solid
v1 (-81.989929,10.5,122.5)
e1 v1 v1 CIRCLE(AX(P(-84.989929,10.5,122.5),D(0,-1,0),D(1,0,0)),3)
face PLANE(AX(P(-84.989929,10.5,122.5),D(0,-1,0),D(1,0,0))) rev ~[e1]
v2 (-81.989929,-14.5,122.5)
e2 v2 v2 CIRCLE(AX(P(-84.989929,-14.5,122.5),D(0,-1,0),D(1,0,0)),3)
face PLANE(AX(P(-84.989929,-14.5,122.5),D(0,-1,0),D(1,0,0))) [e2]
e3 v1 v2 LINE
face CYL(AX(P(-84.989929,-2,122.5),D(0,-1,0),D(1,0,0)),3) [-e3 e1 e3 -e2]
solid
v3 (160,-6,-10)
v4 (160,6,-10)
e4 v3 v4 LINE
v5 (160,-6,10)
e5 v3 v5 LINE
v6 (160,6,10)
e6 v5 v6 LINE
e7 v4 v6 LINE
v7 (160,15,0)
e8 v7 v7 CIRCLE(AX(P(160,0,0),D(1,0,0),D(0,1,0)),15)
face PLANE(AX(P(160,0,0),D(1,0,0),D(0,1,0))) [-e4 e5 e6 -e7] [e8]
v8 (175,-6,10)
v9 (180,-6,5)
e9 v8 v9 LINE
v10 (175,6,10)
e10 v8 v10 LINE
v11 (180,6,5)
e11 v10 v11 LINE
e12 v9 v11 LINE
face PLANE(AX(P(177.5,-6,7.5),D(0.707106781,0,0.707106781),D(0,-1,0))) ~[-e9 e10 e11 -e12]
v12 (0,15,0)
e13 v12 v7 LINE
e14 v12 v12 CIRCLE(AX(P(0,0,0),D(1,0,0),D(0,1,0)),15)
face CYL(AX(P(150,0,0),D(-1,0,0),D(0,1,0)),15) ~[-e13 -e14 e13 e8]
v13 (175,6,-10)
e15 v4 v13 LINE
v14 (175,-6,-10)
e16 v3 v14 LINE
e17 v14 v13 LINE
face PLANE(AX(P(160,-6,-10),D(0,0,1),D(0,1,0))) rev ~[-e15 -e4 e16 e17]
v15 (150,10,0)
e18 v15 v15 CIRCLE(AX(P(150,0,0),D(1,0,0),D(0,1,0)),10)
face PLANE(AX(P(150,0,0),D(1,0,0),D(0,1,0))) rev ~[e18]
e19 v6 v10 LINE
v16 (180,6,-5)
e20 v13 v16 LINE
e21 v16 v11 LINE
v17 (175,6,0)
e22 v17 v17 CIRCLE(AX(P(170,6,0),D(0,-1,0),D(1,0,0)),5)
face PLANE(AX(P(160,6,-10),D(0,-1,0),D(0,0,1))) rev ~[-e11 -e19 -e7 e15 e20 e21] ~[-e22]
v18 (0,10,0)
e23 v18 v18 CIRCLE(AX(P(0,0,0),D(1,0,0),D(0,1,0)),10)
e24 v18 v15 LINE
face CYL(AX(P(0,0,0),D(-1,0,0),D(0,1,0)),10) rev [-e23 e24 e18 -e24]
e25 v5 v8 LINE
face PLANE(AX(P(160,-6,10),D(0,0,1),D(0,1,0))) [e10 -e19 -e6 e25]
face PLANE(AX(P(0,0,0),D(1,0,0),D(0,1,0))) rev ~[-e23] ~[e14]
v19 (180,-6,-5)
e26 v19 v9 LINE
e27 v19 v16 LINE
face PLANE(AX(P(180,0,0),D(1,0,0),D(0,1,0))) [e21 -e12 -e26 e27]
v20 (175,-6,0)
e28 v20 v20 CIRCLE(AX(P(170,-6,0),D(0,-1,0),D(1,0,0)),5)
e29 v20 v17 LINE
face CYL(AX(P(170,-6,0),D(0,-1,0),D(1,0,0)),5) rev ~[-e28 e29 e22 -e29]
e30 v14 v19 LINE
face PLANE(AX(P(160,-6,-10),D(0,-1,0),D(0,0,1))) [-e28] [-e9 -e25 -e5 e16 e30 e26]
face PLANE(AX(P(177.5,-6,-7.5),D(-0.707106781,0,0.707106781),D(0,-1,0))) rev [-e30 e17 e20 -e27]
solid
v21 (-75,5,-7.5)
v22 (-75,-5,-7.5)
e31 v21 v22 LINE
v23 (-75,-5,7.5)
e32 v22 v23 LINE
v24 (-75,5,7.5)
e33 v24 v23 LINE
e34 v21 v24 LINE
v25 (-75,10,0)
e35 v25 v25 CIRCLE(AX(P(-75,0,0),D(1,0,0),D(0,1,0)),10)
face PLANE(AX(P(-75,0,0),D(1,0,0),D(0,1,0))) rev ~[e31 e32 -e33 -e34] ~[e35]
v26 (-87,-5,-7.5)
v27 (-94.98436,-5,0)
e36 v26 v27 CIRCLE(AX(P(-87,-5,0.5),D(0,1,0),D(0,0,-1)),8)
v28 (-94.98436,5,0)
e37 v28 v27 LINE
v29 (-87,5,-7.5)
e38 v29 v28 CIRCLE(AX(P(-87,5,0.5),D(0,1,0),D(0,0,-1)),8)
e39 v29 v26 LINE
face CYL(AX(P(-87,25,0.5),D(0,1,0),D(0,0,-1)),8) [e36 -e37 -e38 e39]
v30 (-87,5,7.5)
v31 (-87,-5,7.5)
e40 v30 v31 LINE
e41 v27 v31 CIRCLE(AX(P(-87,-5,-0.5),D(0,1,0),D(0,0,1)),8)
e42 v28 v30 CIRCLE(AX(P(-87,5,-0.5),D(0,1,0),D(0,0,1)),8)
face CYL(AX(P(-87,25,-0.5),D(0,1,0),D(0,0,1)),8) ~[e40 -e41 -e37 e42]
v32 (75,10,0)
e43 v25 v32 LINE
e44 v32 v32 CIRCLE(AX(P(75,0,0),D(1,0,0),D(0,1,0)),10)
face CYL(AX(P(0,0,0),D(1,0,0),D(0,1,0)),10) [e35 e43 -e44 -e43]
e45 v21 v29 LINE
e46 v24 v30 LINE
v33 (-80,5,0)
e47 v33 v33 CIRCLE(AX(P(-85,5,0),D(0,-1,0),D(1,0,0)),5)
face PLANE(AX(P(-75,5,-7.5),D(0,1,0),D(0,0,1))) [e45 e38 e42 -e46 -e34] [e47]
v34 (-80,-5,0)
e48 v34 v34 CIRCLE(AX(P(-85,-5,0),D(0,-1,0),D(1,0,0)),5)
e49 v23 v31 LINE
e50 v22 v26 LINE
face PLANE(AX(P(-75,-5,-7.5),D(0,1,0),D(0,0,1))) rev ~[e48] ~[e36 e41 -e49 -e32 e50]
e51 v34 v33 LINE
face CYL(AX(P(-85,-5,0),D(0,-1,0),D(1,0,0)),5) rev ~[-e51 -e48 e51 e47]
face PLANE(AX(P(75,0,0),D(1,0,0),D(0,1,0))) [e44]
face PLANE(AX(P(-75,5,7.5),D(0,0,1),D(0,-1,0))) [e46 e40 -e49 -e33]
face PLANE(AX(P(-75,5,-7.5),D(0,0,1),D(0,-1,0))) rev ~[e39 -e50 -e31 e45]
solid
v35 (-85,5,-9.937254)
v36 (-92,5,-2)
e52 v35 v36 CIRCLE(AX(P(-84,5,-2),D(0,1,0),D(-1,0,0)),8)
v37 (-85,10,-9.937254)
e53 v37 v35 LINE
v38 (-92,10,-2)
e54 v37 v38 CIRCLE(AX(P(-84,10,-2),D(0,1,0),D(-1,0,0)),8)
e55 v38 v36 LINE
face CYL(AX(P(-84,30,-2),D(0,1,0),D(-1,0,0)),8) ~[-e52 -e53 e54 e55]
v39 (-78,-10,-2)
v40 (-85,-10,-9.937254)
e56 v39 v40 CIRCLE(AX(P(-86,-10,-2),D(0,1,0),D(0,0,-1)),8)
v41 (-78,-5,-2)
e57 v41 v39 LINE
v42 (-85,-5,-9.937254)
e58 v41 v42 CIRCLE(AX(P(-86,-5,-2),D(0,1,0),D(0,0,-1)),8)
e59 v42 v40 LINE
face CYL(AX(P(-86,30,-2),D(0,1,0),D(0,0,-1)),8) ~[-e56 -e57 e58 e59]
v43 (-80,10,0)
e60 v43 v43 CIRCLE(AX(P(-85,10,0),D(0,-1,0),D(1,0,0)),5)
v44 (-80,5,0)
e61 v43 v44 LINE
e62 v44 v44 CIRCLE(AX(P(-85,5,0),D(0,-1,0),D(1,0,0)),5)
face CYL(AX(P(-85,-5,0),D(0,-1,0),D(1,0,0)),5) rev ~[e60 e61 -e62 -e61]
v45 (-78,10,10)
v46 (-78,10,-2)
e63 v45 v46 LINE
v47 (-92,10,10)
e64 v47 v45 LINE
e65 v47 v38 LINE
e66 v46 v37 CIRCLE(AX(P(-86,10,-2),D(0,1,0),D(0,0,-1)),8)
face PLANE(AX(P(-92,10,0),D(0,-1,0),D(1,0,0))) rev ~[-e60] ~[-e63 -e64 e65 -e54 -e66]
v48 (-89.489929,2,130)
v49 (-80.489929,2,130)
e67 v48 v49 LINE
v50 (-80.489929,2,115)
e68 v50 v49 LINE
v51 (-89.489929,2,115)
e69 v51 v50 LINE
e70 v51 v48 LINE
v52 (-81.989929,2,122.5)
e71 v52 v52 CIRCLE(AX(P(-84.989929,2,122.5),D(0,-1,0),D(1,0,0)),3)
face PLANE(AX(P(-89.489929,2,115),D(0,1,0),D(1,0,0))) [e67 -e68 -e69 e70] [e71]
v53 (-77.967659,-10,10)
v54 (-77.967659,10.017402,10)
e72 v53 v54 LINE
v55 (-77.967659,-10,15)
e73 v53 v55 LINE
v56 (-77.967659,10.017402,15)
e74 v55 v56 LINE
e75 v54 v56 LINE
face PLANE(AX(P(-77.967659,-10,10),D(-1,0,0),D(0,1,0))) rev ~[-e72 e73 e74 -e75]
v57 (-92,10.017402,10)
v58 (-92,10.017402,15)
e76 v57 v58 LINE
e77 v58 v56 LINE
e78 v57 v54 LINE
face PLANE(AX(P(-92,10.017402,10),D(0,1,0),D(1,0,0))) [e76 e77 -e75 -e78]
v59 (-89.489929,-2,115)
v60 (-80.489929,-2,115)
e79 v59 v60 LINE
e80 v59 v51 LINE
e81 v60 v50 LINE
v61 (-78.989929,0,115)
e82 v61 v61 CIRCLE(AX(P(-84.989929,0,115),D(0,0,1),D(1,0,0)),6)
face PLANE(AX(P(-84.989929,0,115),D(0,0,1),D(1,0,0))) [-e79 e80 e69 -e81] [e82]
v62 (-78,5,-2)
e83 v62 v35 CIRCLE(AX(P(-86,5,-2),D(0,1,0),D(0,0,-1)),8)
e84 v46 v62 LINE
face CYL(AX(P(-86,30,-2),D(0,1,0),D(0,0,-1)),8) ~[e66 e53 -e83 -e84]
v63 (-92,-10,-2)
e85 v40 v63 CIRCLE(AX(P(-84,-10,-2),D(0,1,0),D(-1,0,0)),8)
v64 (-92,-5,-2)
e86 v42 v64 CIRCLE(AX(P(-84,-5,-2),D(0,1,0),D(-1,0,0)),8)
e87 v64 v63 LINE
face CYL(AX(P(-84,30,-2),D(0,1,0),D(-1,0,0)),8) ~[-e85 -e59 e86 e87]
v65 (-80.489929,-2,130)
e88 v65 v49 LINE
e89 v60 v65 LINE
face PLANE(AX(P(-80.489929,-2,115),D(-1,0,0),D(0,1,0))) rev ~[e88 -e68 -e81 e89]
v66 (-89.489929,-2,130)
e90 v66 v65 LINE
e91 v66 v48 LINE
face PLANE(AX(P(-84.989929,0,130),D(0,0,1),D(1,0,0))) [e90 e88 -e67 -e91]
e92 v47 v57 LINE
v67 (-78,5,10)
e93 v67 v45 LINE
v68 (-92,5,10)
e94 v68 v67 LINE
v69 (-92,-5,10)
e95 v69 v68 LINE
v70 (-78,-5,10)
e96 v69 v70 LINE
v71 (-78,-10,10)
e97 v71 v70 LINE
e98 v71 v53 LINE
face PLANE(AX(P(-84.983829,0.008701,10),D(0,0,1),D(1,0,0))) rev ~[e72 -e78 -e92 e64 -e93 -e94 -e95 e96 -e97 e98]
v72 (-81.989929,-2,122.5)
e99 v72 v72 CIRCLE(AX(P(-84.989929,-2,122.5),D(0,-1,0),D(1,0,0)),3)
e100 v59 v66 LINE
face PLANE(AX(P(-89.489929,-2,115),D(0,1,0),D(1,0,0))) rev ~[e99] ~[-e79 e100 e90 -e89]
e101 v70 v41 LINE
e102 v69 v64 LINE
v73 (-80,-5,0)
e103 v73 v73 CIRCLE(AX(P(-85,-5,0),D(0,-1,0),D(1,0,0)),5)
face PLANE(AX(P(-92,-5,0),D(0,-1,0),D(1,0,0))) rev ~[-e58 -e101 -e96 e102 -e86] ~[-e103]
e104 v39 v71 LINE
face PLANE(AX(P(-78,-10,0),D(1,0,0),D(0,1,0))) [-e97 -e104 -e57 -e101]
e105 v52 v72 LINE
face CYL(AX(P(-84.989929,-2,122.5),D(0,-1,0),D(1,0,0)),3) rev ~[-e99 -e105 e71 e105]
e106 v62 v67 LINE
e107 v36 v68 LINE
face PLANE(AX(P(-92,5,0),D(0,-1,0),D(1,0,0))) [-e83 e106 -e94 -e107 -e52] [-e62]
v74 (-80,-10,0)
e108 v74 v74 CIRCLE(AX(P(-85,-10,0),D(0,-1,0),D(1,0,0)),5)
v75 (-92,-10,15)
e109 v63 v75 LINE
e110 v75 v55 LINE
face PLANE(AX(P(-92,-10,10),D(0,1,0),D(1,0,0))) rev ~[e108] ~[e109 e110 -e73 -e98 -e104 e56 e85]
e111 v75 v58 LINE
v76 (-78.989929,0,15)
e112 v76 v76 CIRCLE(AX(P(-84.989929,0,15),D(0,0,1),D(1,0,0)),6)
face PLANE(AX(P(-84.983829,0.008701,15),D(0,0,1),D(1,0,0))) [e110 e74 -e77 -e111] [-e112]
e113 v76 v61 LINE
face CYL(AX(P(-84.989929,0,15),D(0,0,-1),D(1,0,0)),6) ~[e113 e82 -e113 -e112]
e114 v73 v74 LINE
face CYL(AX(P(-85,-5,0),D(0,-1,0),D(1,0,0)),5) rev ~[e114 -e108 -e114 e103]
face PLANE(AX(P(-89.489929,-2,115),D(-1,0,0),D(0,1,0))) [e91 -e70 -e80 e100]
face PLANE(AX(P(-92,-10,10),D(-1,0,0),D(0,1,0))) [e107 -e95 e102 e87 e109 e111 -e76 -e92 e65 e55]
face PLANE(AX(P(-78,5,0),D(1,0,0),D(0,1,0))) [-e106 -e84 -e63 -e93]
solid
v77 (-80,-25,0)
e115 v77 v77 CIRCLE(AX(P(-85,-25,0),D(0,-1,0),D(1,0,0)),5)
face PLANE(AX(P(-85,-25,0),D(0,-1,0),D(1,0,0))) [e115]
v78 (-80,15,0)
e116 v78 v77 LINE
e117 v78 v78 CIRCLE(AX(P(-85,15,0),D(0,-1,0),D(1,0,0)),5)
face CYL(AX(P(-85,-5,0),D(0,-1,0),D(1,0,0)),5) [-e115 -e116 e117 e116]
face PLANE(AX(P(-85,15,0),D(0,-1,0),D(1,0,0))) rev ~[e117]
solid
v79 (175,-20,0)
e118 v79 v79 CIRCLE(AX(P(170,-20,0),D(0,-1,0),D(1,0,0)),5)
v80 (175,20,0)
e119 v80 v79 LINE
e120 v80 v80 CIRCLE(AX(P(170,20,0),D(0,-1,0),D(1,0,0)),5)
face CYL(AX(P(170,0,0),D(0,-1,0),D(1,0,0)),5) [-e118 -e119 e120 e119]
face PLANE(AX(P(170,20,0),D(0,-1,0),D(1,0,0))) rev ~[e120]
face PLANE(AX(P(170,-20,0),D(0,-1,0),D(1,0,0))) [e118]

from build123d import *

# Parameters (mm, degrees)
F0_R         = 10
F1_DEPTH     = 75
F2_R         = 15
F2_R_2       = 10
F3_DEPTH     = 150
F4_R         = 15
F5_DEPTH     = 10
F6_W         = 12
F6_H         = 20
F7_DEPTH     = 20
F8_R         = 5
F9_DEPTH     = 21.001
F10_SIZE     = 5
F11_W        = 10
F11_H        = 15
F12_DEPTH    = 20
F13_R        = 5
F14_DEPTH    = 20.001
F15_R        = 5
F16_DEPTH    = 20
F17_W        = 14
F17_H        = 5
F18_DEPTH    = 10
F19_W        = 14.032341361
F19_H        = 20.0174024701
F20_DEPTH    = 5
F21_R        = 5
F22_DEPTH    = 20
F24_T1_DEPTH = 45
F24_T3_DEPTH = 45
F25_R        = 6
F26_DEPTH    = 100
F27_W        = 9
F27_H        = 4
F28_DEPTH    = 15
F29_R        = 3
F30_DEPTH    = 12.5
F32_T1_DEPTH = 50


# Not quite as in the source:
# - a fillet or chamfer that OpenCascade refuses, or shapes differently, is made with other operations: its cross-section is extruded or revolved along the edge and cut away or added


with BuildPart() as f1:
    # F0 (on Right) → F1 (new body, symmetric)
    with BuildSketch(Plane.YZ):
        Circle(F0_R)
    extrude(amount=F1_DEPTH, both=True)

    # F11 (on face) → F12 (join)
    with BuildSketch(Plane(origin=(-75, 0, 0), x_dir=(0, -1, 0), z_dir=(-1, 0, 0))):
        Rectangle(F11_W, F11_H)
    extrude(amount=F12_DEPTH)

    # F13 (on face) → F14 (cut, through all)
    with BuildSketch(Plane.XZ.offset(5)):
        with Locations((-85, 0)):
            Circle(F13_R)
    extrude(amount=-F14_DEPTH, mode=Mode.SUBTRACT)

    # F32: fillet of radius 8 on 2 edges, made by hand

    # F32_s2 → F32_t1 (cut)
    with BuildSketch(Plane.XZ.offset(-25)):
        with BuildLine():
            ThreePointArc((-87, 7.5), (-92.6568542495, 5.1568542495), (-95, -0.5))
            Line((-95, -0.5), (-95, 7.5))
            Line((-95, 7.5), (-87, 7.5))
        make_face()
        with BuildLine():
            ThreePointArc((-87, -7.5), (-92.6568542495, -5.1568542495), (-95, 0.5))
            Line((-95, 0.5), (-95, -7.5))
            Line((-95, -7.5), (-87, -7.5))
        make_face()
    extrude(amount=F32_T1_DEPTH, mode=Mode.SUBTRACT)


with BuildPart() as f3:
    # F2 (on Right) → F3 (new body)
    with BuildSketch(Plane.YZ):
        Circle(F2_R)
        Circle(F2_R_2, mode=Mode.SUBTRACT)
    extrude(amount=F3_DEPTH)

    # F4 (on face) → F5 (join)
    with BuildSketch(Plane.YZ.offset(150)):
        Circle(F4_R)
    extrude(amount=F5_DEPTH)

    # F6 (on face) → F7 (join)
    with BuildSketch(Plane.YZ.offset(160)):
        Rectangle(F6_W, F6_H)
    extrude(amount=F7_DEPTH)

    # F8 (on face) → F9 (cut, through all)
    with BuildSketch(Plane.XZ.offset(6)):
        with Locations((170, 0)):
            Circle(F8_R)
    extrude(amount=-F9_DEPTH, mode=Mode.SUBTRACT)

    # F10
    f10_edges = [f3.edges().sort_by_distance(p)[0] for p in [
        (180, 0, 10),
        (180, 0, -10),
    ]]
    chamfer(f10_edges, length=F10_SIZE)


with BuildPart() as f16:
    # F15 (on Front) → F16 (new body, symmetric)
    with BuildSketch(Plane.XZ):
        with Locations((170, 0)):
            Circle(F15_R)
    extrude(amount=F16_DEPTH, both=True)


with BuildPart() as f18:
    # F17 (on Top) → F18 (new body, symmetric)
    with BuildSketch(Plane.XY):
        with Locations((-85, 7.5)):
            Rectangle(F17_W, F17_H)
    extrude(amount=F18_DEPTH, both=True)



with BuildPart() as f18b:
    # F17 (on Top) → F18, piece 2 (new body, symmetric)
    with BuildSketch(Plane.XY):
        with Locations((-85, -7.5)):
            Rectangle(F17_W, F17_H)
    extrude(amount=F18_DEPTH, both=True)


with BuildPart() as f18_1:
    add(f18.part)

    add(f18b.part)  # F20 merges F18b
    # F19 (on face) → F20 (join)
    with BuildSketch(Plane.XY.offset(10)):
        with Locations((-84.9838293195, 0.0087012351)):
            Rectangle(F19_W, F19_H)
    extrude(amount=F20_DEPTH)


with BuildPart() as f22:
    # F21 (on face) → F22 (new body, symmetric)
    with BuildSketch(Plane.XZ.offset(5)):
        with Locations((-85, 0)):
            Circle(F21_R)
    extrude(amount=F22_DEPTH, both=True)


with BuildPart() as f18_2:
    add(f18_1.part)

    # F23: cut F22
    add(f22.part, mode=Mode.SUBTRACT)

    # F24: fillet of radius 8 on 4 edges, made by hand

    # F24_s2 → F24_t1 (cut)
    with BuildSketch(Plane.XZ.offset(-30)):
        with BuildLine():
            ThreePointArc((-92, -2), (-89.6568542495, -7.6568542495), (-84, -10))
            Line((-84, -10), (-92, -10))
            Line((-92, -10), (-92, -2))
        make_face()
        with BuildLine():
            ThreePointArc((-86, -10), (-80.3431457505, -7.6568542495), (-78, -2))
            Line((-78, -2), (-78, -10))
            Line((-78, -10), (-86, -10))
        make_face()
    extrude(amount=F24_T1_DEPTH, mode=Mode.SUBTRACT)

    # F24_s4 → F24_t3 (cut)
    with BuildSketch(Plane.XZ.offset(-15)):
        with BuildLine():
            ThreePointArc((-86, -10), (-80.3431457505, -7.6568542495), (-78, -2))
            Line((-78, -2), (-78, -10))
            Line((-78, -10), (-86, -10))
        make_face()
        with BuildLine():
            ThreePointArc((-84, -10), (-89.6568542495, -7.6568542495), (-92, -2))
            Line((-92, -2), (-92, -10))
            Line((-92, -10), (-84, -10))
        make_face()
    extrude(amount=F24_T3_DEPTH, mode=Mode.SUBTRACT)

    # F25 (on face) → F26 (join)
    with BuildSketch(Plane.XY.offset(15)):
        with Locations((-84.9899289471, 0)):
            Circle(F25_R)
    extrude(amount=F26_DEPTH)

    # F27 (on face) → F28 (join)
    with BuildSketch(Plane.XY.offset(115)):
        with Locations((-84.9899289471, 0)):
            Rectangle(F27_W, F27_H)
    extrude(amount=F28_DEPTH)


with BuildPart() as f30:
    # F29 (on face) → F30 (new body, symmetric)
    with BuildSketch(Plane.XZ.offset(2)):
        with Locations((-84.9899289471, 122.5)):
            Circle(F29_R)
    extrude(amount=F30_DEPTH, both=True)


with BuildPart() as f18_3:
    add(f18_2.part)

    # F31: cut F30
    add(f30.part, mode=Mode.SUBTRACT)


solid = Compound([f1.part, f3.part, f16.part, f22.part, f30.part, f18_3.part])
